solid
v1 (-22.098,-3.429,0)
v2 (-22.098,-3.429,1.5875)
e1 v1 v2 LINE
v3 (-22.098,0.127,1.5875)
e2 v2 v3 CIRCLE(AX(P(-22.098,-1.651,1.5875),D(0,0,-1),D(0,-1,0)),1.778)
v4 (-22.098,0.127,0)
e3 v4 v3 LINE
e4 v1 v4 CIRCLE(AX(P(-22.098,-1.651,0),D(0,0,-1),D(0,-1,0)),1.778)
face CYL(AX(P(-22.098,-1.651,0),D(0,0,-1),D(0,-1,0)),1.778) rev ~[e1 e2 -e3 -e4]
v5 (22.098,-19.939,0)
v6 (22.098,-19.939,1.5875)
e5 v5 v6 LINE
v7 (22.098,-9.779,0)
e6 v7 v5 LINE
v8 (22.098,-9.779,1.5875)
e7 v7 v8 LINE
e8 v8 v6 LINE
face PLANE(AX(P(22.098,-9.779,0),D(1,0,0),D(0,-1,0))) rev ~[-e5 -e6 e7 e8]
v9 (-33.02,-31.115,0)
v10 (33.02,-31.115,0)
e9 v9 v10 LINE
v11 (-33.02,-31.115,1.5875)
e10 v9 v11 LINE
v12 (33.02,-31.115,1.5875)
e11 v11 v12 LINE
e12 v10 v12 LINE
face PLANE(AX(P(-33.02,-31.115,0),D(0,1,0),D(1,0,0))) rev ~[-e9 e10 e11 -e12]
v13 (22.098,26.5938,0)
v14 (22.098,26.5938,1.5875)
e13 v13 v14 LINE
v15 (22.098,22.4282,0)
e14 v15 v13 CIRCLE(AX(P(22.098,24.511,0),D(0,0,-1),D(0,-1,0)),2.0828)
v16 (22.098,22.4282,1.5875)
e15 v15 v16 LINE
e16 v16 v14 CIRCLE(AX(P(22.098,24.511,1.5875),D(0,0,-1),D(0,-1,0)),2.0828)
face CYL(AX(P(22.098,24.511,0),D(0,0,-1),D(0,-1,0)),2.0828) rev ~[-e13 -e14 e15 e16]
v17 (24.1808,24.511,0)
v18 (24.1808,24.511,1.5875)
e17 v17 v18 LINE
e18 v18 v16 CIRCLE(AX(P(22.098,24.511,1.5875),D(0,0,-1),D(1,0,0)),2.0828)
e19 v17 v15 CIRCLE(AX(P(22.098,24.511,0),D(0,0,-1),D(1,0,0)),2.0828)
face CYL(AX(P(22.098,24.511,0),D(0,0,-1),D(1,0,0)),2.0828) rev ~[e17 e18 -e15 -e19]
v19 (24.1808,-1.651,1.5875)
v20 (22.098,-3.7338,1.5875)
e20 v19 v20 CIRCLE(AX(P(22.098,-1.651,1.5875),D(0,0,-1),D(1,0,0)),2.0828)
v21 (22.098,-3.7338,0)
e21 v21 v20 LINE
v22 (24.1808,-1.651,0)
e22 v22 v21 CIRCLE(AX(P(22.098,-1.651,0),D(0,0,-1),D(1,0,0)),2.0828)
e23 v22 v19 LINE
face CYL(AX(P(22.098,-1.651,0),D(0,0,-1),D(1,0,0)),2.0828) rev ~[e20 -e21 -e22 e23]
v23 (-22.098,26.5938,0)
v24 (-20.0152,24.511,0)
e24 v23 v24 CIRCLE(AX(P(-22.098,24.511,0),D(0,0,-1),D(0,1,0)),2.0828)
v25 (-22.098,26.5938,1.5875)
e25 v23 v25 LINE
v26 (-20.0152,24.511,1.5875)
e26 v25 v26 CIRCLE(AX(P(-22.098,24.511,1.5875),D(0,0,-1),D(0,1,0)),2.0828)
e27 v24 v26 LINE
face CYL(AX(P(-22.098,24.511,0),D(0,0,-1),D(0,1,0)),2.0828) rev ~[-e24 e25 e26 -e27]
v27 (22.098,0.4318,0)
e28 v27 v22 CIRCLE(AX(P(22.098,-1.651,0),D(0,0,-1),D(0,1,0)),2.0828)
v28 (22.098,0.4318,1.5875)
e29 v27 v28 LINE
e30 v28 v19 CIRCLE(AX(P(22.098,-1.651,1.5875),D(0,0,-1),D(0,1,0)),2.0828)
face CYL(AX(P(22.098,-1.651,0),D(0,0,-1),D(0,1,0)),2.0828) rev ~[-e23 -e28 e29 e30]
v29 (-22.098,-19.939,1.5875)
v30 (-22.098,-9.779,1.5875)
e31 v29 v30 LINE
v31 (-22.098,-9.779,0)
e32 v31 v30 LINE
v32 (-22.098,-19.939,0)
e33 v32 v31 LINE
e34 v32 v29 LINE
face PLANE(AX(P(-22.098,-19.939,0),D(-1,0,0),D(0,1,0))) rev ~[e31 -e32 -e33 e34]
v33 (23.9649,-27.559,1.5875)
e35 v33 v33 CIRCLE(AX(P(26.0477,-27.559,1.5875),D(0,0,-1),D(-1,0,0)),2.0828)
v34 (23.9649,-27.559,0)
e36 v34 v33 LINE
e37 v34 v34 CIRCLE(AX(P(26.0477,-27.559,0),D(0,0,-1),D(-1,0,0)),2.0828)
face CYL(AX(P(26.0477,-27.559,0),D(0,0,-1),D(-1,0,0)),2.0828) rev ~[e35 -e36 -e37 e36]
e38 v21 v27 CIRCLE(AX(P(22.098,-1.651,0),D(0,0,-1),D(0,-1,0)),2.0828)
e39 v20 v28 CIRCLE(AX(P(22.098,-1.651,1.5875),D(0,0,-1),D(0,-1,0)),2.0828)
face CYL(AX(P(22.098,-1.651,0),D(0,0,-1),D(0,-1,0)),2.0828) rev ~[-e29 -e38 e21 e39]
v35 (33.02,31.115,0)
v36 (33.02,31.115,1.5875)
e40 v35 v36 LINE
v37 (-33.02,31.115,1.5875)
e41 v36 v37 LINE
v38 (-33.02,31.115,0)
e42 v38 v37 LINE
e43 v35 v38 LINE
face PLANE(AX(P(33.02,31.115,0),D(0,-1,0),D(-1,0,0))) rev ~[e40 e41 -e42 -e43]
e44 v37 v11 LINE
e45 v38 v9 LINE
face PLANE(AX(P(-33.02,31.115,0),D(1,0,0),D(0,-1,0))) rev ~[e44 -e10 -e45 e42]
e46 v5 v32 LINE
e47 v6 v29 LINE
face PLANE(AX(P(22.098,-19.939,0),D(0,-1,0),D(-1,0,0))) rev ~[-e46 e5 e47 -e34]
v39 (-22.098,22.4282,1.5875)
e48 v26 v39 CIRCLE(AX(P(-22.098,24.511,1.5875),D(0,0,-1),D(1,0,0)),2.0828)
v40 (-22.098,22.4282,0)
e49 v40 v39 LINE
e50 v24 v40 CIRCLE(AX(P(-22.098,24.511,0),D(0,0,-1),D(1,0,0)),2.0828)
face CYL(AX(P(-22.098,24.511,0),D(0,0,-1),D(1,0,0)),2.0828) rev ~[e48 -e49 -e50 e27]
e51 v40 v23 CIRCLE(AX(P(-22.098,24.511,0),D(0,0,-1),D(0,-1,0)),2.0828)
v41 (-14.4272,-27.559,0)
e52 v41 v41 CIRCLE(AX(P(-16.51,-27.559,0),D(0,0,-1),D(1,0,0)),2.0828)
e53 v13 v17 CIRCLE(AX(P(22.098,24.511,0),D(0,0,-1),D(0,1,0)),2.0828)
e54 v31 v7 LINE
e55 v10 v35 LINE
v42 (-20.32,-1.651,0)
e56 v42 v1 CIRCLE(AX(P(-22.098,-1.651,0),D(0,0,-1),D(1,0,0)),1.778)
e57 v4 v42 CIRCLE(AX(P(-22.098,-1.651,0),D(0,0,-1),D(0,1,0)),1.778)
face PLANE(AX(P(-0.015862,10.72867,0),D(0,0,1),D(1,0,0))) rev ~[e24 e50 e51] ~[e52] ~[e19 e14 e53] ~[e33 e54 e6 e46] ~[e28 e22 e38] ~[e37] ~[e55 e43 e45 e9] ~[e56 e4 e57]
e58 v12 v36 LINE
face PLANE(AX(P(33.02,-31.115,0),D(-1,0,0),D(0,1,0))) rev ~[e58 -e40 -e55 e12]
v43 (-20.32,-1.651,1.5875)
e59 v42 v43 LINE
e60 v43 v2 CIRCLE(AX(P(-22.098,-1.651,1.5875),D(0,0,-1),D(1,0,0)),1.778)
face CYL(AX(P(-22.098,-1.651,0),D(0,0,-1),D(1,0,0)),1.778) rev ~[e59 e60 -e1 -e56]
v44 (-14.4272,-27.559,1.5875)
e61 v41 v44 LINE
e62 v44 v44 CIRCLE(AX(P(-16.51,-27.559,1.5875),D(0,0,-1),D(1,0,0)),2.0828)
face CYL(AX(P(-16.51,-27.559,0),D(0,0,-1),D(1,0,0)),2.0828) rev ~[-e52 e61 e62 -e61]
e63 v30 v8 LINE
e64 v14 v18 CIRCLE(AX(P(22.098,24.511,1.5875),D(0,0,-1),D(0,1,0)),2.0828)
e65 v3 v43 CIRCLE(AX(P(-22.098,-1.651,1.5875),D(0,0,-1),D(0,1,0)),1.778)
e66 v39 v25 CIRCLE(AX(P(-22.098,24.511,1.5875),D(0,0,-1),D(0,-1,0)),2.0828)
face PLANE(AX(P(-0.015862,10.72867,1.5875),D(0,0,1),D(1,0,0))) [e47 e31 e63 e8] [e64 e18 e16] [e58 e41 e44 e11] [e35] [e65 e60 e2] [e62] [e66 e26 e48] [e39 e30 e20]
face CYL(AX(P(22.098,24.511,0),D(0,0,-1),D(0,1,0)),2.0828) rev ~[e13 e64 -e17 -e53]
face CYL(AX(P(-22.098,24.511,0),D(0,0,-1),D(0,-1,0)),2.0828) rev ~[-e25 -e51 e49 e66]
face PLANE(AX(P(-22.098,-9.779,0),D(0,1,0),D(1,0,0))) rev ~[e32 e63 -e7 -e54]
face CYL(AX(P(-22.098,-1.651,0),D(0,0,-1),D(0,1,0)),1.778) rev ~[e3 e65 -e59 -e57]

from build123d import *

# Parameters (mm, degrees)
F1_DEPTH = 1.5875


# Not quite as in the source:
# - a length typed as a fraction of an inch, garbled in the dataset ("3 / 203.2 mm" for 3/8 in), is restored


with BuildPart() as f1:
    # F0 (on Top) → F1 (new body)
    with BuildSketch(Plane.XY):
        with BuildLine():
            Line((22.098, 26.5938), (22.098, 31.115))
            Line((22.098, 31.115), (0, 31.115))
            Line((0, 31.115), (-22.098, 31.115))
            Line((-22.098, 31.115), (-22.098, 26.5938))
            ThreePointArc((-22.098, 26.5938), (-20.6252379961, 25.9837620039), (-20.0152, 24.511))
            ThreePointArc((-20.0152, 24.511), (-20.6252379961, 23.0382379961), (-22.098, 22.4282))
            Line((-22.098, 22.4282), (-22.098, 0.127))
            ThreePointArc((-22.098, 0.127), (-20.8407641431, -0.3937641431), (-20.32, -1.651))
            ThreePointArc((-20.32, -1.651), (-20.8407641431, -2.9082358569), (-22.098, -3.429))
            Line((-22.098, -3.429), (-22.098, -9.779))
            Line((-22.098, -9.779), (22.098, -9.779))
            Line((22.098, -9.779), (22.098, -3.7338))
            ThreePointArc((22.098, -3.7338), (20.0152, -1.651), (22.098, 0.4318))
            Line((22.098, 0.4318), (22.098, 22.4282))
            ThreePointArc((22.098, 22.4282), (20.0152, 24.511), (22.098, 26.5938))
        make_face()
        with BuildLine():
            Line((-22.098, 26.5938), (-22.098, 31.115))
            Line((-22.098, 31.115), (-33.02, 31.115))
            Line((-33.02, 31.115), (-33.02, -31.115))
            Line((-33.02, -31.115), (-22.098, -31.115))
            Line((-22.098, -31.115), (-22.098, -27.559))
            Line((-22.098, -27.559), (-22.098, -19.939))
            Line((-22.098, -19.939), (-22.098, -9.779))
            Line((-22.098, -9.779), (-22.098, -3.429))
            ThreePointArc((-22.098, -3.429), (-23.876, -1.651), (-22.098, 0.127))
            Line((-22.098, 0.127), (-22.098, 22.4282))
            ThreePointArc((-22.098, 22.4282), (-24.1808, 24.511), (-22.098, 26.5938))
        make_face()
        with BuildLine():
            Line((33.02, -27.559), (33.02, 31.115))
            Line((33.02, 31.115), (22.098, 31.115))
            Line((22.098, 31.115), (22.098, 26.5938))
            ThreePointArc((22.098, 26.5938), (23.5707620039, 25.9837620039), (24.1808, 24.511))
            ThreePointArc((24.1808, 24.511), (23.5707620039, 23.0382379961), (22.098, 22.4282))
            Line((22.098, 22.4282), (22.098, 0.4318))
            ThreePointArc((22.098, 0.4318), (23.5707620039, -0.1782379961), (24.1808, -1.651))
            ThreePointArc((24.1808, -1.651), (23.5707620039, -3.1237620039), (22.098, -3.7338))
            Line((22.098, -3.7338), (22.098, -9.779))
            Line((22.098, -9.779), (22.098, -19.939))
            Line((22.098, -19.939), (22.098, -27.559))
            Line((22.098, -27.559), (23.9649, -27.559))
            ThreePointArc((23.9649, -27.559), (26.0477, -25.4762), (28.1305, -27.559))
            Line((28.1305, -27.559), (33.02, -27.559))
        make_face()
        with BuildLine():
            Line((33.02, -31.115), (33.02, -27.559))
            Line((33.02, -27.559), (28.1305, -27.559))
            ThreePointArc((28.1305, -27.559), (26.0477, -29.6418), (23.9649, -27.559))
            Line((23.9649, -27.559), (22.098, -27.559))
            Line((22.098, -27.559), (22.098, -31.115))
            Line((22.098, -31.115), (33.02, -31.115))
        make_face()
        with BuildLine():
            Line((-14.4272, -27.559), (22.098, -27.559))
            Line((22.098, -27.559), (22.098, -19.939))
            Line((22.098, -19.939), (-22.098, -19.939))
            Line((-22.098, -19.939), (-22.098, -27.559))
            Line((-22.098, -27.559), (-18.5928, -27.559))
            ThreePointArc((-18.5928, -27.559), (-16.51, -25.4762), (-14.4272, -27.559))
        make_face()
        with BuildLine():
            Line((-22.098, -31.115), (22.098, -31.115))
            Line((22.098, -31.115), (22.098, -27.559))
            Line((22.098, -27.559), (-14.4272, -27.559))
            ThreePointArc((-14.4272, -27.559), (-16.51, -29.6418), (-18.5928, -27.559))
            Line((-18.5928, -27.559), (-22.098, -27.559))
            Line((-22.098, -27.559), (-22.098, -31.115))
        make_face()
    extrude(amount=F1_DEPTH)


solid = f1.part
